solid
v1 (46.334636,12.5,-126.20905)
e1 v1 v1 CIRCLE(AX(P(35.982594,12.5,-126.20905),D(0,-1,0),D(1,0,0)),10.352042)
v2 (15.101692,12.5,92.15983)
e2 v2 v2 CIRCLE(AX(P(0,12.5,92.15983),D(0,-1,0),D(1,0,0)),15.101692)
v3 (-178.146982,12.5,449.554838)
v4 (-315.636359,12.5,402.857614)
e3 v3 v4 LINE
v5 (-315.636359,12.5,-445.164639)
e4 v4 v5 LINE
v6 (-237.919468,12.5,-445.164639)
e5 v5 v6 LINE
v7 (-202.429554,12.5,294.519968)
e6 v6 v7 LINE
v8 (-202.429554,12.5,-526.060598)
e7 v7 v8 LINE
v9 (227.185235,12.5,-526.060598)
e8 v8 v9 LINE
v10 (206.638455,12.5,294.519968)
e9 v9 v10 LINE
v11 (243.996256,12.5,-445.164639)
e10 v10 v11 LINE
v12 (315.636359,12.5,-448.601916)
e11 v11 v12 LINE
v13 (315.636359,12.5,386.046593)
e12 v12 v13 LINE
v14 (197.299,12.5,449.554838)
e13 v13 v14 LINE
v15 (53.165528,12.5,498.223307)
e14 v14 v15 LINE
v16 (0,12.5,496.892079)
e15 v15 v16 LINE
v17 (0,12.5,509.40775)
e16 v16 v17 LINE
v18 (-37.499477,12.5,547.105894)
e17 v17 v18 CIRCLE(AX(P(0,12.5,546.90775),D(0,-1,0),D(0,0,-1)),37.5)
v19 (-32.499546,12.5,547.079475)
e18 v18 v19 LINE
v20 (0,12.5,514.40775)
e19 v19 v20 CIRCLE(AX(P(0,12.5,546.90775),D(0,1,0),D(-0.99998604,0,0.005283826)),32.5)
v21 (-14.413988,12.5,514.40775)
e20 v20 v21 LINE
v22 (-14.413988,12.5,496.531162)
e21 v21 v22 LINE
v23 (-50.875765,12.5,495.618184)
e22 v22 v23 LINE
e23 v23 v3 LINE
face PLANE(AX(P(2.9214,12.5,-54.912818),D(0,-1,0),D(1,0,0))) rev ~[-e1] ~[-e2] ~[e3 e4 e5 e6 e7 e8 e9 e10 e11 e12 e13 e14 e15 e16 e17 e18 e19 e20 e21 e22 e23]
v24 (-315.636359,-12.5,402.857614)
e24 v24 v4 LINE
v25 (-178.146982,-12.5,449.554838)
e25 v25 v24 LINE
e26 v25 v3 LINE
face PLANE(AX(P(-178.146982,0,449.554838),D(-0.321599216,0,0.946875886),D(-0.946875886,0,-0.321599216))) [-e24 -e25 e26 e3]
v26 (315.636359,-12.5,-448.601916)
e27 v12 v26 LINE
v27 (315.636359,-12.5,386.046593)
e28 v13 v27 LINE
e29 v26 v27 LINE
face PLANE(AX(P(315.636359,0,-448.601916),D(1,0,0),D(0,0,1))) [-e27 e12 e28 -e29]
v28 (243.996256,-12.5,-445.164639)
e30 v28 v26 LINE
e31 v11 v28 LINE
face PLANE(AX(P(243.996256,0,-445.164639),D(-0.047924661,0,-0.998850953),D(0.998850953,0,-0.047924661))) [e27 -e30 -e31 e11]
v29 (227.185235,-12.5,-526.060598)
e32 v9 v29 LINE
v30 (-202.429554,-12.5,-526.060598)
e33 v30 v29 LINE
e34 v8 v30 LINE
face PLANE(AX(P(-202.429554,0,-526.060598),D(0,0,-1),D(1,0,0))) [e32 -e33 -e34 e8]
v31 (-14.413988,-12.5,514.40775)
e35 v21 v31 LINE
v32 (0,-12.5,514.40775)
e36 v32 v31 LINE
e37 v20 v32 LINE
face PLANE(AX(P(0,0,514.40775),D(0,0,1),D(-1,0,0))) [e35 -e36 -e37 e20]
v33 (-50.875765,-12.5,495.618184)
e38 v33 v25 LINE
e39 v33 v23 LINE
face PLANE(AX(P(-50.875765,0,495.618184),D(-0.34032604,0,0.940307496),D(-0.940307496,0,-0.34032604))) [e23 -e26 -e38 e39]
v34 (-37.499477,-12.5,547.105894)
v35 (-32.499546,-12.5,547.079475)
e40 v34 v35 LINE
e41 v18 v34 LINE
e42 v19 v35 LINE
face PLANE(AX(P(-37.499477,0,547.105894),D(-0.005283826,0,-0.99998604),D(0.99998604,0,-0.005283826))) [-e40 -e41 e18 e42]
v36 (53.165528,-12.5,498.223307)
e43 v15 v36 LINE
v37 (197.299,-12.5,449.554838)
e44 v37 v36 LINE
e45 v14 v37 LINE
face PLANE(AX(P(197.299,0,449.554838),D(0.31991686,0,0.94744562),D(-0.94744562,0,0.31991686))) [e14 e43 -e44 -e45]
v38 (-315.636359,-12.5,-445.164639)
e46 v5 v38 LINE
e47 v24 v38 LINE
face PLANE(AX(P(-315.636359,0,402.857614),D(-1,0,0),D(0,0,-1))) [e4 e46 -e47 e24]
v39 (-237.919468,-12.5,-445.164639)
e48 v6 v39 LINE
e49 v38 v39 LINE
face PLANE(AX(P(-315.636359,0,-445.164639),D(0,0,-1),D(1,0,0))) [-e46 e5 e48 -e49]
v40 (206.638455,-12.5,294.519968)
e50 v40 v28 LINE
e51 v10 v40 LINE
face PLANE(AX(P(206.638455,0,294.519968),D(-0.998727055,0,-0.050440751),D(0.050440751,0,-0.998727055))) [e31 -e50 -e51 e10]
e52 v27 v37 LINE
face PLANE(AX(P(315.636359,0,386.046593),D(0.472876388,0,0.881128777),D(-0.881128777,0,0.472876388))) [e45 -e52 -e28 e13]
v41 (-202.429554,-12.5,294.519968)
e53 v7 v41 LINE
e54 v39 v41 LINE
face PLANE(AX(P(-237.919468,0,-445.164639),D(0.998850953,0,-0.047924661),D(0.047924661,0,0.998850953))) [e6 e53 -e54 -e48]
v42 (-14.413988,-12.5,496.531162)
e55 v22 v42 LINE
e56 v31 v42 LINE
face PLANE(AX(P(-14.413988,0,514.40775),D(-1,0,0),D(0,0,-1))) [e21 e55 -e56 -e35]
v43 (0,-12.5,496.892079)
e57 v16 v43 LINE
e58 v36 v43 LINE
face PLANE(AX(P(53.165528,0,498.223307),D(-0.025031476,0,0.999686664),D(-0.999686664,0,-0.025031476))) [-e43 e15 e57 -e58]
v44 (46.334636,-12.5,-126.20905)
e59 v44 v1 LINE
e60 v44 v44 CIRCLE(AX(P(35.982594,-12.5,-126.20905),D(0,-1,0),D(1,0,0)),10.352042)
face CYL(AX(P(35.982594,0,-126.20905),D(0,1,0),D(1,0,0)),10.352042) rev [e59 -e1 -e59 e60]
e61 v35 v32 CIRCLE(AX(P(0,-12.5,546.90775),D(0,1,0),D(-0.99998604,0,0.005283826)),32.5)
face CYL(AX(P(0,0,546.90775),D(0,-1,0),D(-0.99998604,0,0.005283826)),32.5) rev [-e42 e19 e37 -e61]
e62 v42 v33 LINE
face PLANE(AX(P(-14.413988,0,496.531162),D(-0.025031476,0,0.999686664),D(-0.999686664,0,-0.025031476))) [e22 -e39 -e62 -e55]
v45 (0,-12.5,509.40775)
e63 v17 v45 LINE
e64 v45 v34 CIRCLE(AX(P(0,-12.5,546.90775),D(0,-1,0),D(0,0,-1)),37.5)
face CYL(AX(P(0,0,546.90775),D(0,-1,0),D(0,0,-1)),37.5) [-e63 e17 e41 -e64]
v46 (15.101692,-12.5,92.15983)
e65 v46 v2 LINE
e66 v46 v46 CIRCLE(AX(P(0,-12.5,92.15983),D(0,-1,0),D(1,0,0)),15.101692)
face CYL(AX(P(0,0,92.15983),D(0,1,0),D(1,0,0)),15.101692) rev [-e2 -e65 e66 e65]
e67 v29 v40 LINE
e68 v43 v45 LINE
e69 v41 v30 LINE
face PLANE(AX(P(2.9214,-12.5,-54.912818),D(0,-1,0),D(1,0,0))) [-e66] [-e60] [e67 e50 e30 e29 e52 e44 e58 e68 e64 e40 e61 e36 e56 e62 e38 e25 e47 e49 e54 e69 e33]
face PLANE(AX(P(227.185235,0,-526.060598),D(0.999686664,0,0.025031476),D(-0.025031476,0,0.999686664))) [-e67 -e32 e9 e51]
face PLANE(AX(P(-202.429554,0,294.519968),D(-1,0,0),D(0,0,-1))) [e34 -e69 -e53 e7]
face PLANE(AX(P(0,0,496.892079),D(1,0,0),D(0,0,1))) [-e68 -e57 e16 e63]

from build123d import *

# Parameters (mm, degrees)
F0_R     = 10.3520416824
F0_R_2   = 15.1016918028
F1_DEPTH = 12.5


with BuildPart() as f1:
    # F0 (on Front) → F1 (new body, symmetric)
    with BuildSketch(Plane.XZ):
        Polygon((-315.6363590755, 402.8576135222), (-315.6363590755, -445.1646387913), (-237.9194677537, -445.1646387913), (-202.4295538493, 294.5199684009), (-202.4295538493, -526.0605984591), (227.1852354976, -526.0605984591), (206.6384547892, 294.5199684009), (243.9962564237, -445.1646387913), (315.6363590755, -448.601916045), (315.6363590755, 386.046592596), (197.2990004611, 449.5548381291), (53.1655277069, 498.2233074495), (0, 496.8920787035), (-14.4139876592, 496.531162231), (-50.8757645807, 495.6181840727), (-178.146982003, 449.5548381291), align=None)
        with Locations((35.982593894, -126.2090504169)):
            Circle(F0_R, mode=Mode.SUBTRACT)
        with Locations((0, 92.1598300338)):
            Circle(F0_R_2, mode=Mode.SUBTRACT)
        with BuildLine():
            Line((-14.4139876592, 514.4077504381), (-14.4139876592, 496.531162231))
            Line((-14.4139876592, 496.531162231), (0, 496.8920787035))
            Line((0, 496.8920787035), (0, 509.4077504381))
            ThreePointArc((0, 509.4077504381), (26.5864663022, 573.3541076459), (-37.4994765184, 547.1058939281))
            Line((-37.4994765184, 547.1058939281), (-32.499546316, 547.0794747961))
            ThreePointArc((-32.499546316, 547.0794747961), (23.0416041286, 569.8279266848), (0, 514.4077504381))
            Line((0, 514.4077504381), (-14.4139876592, 514.4077504381))
        make_face()
    extrude(amount=F1_DEPTH, both=True)


solid = f1.part
